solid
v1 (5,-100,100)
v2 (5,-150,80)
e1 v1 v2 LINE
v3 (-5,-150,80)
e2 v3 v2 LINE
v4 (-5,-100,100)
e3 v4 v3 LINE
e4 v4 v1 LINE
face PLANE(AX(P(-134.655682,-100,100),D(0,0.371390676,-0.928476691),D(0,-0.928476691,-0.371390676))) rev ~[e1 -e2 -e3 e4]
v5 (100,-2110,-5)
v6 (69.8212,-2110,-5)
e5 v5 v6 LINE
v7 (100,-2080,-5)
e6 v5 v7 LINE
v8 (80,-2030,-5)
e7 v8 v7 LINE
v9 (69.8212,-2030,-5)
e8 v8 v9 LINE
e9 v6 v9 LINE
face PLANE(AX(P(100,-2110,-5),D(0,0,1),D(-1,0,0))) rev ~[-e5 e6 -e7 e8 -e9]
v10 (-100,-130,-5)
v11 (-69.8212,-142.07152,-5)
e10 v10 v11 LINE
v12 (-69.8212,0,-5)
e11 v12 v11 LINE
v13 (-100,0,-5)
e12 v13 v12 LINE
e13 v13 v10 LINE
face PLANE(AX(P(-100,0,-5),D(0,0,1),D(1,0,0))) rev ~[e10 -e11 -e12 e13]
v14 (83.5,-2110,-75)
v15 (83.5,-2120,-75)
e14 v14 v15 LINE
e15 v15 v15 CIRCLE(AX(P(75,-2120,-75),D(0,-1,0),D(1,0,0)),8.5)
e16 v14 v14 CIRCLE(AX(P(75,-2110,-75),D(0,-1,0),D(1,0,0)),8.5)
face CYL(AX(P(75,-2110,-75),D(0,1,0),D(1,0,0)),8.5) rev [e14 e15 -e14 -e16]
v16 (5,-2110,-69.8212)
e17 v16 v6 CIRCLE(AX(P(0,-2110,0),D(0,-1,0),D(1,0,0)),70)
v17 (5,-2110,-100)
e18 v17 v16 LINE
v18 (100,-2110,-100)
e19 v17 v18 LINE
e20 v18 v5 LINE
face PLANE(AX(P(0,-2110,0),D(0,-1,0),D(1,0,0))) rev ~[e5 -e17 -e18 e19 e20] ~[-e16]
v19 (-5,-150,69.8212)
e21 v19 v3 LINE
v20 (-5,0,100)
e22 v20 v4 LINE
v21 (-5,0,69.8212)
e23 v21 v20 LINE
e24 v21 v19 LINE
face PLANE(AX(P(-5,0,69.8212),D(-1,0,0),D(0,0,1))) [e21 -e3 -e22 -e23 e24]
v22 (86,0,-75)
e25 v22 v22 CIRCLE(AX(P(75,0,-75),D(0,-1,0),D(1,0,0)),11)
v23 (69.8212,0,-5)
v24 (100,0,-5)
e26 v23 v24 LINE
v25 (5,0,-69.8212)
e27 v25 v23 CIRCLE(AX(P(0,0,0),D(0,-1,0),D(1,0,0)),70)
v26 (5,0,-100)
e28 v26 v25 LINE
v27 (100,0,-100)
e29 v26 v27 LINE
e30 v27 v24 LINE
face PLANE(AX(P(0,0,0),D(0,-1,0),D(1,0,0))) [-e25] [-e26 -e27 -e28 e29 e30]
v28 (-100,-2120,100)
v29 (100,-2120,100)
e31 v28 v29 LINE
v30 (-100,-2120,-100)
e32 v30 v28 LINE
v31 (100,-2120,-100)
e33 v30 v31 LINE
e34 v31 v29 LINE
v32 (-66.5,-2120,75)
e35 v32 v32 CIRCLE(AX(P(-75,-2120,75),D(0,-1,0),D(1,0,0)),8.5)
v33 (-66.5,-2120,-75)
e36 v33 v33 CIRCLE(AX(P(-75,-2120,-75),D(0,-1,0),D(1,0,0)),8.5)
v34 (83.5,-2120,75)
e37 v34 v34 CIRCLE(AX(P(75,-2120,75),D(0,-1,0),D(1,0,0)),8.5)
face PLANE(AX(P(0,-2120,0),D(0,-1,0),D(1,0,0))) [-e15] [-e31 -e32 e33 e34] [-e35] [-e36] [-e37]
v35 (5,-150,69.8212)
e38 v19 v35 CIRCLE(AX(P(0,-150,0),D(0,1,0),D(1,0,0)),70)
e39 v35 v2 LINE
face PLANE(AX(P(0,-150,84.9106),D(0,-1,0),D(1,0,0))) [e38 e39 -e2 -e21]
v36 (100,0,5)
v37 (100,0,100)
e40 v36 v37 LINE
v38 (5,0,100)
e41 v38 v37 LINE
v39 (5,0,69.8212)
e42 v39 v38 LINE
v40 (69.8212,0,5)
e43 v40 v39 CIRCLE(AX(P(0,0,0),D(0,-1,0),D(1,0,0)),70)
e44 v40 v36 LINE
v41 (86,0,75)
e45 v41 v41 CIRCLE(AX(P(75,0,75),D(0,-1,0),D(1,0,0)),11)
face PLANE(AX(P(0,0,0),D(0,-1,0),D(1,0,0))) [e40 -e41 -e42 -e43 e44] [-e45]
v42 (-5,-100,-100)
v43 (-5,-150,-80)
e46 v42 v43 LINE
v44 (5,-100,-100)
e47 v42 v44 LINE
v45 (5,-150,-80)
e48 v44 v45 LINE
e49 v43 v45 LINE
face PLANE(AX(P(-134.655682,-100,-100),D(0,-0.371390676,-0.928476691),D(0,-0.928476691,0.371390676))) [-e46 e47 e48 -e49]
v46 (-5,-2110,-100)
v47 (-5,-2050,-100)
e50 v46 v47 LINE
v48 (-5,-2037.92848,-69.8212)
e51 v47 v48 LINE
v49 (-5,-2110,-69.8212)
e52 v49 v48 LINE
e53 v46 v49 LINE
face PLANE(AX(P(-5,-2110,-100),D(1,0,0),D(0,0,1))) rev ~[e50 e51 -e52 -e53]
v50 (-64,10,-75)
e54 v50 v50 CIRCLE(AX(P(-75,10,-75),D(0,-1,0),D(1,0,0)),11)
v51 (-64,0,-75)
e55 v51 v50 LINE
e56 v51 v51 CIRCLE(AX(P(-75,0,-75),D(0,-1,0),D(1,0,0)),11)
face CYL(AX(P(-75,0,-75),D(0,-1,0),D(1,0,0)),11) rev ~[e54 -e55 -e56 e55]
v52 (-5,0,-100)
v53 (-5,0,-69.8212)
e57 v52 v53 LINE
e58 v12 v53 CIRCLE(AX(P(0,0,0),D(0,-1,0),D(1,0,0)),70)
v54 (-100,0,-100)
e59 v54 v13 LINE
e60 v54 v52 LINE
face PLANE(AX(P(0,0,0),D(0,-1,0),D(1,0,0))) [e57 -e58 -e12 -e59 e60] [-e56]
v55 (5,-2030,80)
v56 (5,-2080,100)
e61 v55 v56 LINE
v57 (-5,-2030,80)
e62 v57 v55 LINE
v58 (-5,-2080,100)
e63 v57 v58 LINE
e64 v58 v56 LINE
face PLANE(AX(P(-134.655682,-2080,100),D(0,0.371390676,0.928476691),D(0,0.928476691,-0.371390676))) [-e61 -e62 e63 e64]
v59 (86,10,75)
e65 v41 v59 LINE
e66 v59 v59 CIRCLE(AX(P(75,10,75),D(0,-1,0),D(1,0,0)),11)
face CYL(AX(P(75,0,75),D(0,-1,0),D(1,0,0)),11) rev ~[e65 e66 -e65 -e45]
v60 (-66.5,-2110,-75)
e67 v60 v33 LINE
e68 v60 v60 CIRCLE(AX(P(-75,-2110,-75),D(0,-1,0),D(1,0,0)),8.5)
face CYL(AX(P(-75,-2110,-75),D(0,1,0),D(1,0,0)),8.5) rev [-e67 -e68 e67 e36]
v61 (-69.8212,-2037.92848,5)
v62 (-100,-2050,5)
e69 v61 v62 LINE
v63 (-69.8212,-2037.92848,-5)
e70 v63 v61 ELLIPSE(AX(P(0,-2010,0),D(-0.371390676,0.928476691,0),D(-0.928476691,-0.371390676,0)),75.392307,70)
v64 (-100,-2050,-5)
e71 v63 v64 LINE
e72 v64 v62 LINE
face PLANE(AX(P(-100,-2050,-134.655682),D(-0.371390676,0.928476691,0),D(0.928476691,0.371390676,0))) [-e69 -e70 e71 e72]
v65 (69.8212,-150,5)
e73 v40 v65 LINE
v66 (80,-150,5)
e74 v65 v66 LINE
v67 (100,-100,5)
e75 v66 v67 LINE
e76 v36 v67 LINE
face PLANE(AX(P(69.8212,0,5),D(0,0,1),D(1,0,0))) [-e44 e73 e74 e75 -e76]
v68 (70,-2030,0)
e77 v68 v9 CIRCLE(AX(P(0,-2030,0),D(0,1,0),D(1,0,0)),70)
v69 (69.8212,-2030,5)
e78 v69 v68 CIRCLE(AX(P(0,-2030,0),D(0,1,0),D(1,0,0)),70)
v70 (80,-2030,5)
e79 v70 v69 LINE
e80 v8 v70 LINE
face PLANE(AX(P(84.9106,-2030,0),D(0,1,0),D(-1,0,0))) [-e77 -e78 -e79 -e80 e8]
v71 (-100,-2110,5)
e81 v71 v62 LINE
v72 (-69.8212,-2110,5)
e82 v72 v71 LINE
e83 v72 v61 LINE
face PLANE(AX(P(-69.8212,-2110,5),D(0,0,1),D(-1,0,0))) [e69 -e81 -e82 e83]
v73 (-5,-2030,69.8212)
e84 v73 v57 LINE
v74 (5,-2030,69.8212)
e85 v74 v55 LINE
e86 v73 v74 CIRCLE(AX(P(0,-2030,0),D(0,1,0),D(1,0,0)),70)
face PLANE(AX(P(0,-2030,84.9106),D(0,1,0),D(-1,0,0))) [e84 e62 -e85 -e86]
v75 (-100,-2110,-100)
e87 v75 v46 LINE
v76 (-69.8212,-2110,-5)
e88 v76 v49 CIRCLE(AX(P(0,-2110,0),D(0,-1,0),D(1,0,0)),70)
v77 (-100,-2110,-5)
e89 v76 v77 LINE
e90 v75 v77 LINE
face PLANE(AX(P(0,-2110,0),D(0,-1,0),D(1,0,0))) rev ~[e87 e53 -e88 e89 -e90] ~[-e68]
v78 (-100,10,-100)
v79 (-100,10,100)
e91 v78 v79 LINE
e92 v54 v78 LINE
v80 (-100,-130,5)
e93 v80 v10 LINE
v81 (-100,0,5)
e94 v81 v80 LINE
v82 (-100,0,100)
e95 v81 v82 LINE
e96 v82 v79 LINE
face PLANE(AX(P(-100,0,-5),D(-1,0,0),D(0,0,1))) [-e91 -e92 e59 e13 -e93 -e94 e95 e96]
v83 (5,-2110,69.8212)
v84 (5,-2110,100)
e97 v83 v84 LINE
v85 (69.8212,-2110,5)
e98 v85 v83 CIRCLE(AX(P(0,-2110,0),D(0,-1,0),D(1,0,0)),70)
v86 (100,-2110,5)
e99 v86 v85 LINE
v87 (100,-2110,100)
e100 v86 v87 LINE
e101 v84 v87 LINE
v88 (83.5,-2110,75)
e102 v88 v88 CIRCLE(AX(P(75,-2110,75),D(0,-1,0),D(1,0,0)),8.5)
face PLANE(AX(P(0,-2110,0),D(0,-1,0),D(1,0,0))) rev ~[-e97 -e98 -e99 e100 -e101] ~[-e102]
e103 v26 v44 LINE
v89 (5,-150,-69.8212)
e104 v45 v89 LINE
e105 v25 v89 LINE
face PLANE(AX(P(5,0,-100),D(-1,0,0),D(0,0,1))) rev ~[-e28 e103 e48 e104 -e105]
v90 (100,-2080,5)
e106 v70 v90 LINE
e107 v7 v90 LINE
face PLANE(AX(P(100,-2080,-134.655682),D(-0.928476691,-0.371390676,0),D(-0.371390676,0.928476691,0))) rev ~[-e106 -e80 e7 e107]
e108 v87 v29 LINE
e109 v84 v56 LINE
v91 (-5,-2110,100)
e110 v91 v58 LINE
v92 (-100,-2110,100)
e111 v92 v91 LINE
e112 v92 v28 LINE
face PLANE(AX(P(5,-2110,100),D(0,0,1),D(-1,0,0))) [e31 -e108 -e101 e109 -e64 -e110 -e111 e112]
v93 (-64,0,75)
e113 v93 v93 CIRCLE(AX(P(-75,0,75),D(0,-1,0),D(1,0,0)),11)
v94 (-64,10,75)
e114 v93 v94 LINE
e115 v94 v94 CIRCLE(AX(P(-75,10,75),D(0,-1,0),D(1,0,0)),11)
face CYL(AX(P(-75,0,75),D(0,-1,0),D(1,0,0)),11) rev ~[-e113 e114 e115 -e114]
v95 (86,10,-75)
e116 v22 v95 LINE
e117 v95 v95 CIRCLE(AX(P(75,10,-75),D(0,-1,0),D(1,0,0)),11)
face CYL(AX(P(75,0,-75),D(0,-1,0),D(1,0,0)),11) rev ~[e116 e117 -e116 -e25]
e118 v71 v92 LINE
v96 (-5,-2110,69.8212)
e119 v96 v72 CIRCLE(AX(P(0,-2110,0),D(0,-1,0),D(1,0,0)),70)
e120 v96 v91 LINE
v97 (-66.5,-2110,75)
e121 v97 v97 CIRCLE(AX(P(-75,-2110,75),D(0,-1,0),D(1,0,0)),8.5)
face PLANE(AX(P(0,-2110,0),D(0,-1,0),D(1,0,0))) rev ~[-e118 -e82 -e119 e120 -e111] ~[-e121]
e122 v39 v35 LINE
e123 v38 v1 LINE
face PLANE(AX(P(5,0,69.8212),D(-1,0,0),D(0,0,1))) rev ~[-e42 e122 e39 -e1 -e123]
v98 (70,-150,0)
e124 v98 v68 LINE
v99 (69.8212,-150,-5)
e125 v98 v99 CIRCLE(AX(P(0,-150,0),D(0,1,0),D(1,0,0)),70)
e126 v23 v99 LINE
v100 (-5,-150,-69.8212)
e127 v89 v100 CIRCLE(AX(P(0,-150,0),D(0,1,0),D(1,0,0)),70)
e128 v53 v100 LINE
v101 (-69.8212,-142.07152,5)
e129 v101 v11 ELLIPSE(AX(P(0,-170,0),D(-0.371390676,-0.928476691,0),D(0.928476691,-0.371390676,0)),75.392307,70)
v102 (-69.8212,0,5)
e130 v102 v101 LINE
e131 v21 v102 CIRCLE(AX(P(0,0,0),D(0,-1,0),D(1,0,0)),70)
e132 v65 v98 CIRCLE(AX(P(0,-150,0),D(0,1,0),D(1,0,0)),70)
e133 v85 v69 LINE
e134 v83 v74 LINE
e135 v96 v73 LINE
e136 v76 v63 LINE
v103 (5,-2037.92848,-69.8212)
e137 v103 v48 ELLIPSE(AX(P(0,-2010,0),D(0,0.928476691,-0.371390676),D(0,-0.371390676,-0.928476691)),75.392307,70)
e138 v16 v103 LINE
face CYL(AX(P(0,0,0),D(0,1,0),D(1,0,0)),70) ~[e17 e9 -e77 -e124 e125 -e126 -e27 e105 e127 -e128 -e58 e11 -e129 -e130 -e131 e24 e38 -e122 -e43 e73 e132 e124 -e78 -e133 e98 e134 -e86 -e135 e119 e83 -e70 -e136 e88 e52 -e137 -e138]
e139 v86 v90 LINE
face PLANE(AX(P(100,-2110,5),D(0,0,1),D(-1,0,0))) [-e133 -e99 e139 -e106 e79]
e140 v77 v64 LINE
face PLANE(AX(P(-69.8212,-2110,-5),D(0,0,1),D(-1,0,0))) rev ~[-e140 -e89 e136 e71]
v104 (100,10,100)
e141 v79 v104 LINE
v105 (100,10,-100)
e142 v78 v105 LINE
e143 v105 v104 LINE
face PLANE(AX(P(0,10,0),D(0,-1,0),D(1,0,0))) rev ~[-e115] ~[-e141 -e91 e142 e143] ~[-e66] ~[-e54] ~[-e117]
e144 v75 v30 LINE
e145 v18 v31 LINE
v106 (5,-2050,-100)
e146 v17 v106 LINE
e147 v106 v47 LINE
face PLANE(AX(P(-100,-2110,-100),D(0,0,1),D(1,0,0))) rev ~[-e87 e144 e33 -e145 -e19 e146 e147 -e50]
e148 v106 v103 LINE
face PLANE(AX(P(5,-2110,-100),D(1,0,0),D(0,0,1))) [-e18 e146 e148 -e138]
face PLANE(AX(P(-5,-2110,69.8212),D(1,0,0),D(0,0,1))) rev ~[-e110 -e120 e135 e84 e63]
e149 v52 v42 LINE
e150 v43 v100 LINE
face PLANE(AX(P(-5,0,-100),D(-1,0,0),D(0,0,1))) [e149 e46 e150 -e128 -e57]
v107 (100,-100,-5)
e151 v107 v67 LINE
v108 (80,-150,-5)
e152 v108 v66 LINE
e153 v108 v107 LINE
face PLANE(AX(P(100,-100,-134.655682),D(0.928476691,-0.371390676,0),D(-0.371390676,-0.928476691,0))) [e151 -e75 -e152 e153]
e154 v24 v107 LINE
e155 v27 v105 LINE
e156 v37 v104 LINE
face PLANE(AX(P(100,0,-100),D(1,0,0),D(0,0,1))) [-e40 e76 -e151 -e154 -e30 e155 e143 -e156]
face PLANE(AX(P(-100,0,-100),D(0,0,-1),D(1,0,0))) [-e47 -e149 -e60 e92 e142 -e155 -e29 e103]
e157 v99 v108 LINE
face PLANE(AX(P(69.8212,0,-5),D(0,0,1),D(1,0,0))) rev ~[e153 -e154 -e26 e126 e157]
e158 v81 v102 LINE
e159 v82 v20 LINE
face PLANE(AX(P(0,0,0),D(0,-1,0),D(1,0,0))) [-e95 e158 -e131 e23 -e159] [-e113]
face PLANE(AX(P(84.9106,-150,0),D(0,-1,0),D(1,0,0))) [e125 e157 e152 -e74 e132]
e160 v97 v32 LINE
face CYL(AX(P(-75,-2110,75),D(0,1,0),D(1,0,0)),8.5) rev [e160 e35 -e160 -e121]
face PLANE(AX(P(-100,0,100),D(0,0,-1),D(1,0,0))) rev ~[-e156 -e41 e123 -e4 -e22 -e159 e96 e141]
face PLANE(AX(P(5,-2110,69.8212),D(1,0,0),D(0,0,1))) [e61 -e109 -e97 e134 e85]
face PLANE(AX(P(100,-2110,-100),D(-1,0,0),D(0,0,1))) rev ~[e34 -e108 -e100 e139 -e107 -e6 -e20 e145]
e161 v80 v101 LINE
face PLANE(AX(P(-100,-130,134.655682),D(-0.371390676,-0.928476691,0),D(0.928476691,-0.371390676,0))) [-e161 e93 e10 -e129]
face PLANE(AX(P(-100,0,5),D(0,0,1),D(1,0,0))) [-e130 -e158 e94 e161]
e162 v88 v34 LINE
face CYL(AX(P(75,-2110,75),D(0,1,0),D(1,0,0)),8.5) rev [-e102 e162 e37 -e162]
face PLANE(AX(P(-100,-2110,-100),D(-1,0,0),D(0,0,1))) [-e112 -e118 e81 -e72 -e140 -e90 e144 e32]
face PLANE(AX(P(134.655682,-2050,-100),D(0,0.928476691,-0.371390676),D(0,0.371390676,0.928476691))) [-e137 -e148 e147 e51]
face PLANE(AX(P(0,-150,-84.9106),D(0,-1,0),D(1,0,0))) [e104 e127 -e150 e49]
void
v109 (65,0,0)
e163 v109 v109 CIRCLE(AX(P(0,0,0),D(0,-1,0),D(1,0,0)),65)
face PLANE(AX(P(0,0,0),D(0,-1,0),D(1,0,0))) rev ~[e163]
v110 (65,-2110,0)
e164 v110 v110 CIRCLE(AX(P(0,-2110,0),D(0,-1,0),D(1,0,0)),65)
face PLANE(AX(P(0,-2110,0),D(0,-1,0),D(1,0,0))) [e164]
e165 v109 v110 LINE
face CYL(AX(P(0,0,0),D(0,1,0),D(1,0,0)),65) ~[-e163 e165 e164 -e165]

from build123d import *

# Parameters (mm, degrees)
F0_R          = 70
F0_R_2        = 65
F1_DEPTH      = 2110
F2_W          = 200
F2_H          = 200
F2_R          = 11
F3_DEPTH      = 10
F4_W          = 30.1787997812
F4_H          = 10
F4_W_2        = 10
F4_H_2        = 30.1787997812
F5_DEPTH      = 150
F6_T1_DEPTH   = 269.311363913
F6_T3_DEPTH   = 269.311363913
F6_T8_DEPTH   = 269.311363913
F6_S9_R       = 70
F6_T10_DEPTH  = 139
F8_W          = 200
F8_H          = 200
F8_R          = 8.5
F9_DEPTH      = 10
F10_W         = 10
F10_H         = 30.1787997812
F10_W_2       = 30.1787997812
F10_H_2       = 10
F11_DEPTH     = 80
F12_T1_DEPTH  = 269.311363913
F12_T3_DEPTH  = 269.311363913
F12_T8_DEPTH  = 269.311363913
F12_S9_R      = 70
F12_T10_DEPTH = 139
F12_T14_DEPTH = 269.311363913
F12_S15_R     = 70
F12_T16_DEPTH = 139


# Not quite as in the source:
# - a fillet or chamfer that OpenCascade refuses, or shapes differently, is made with other operations: its cross-section is extruded or revolved along the edge and cut away or added


with BuildPart() as f1:
    # F0 (on Front) → F1 (new body)
    with BuildSketch(Plane.XZ):
        Circle(F0_R)
        Circle(F0_R_2, mode=Mode.SUBTRACT)
    extrude(amount=F1_DEPTH)

    # F2 (on Front) → F3 (join)
    with BuildSketch(Plane.XZ):
        Rectangle(F2_W, F2_H)
        with Locations((-75, -75)):
            Circle(F2_R, mode=Mode.SUBTRACT)
        with Locations((75, -75)):
            Circle(F2_R, mode=Mode.SUBTRACT)
        with Locations((-75, 75)):
            Circle(F2_R, mode=Mode.SUBTRACT)
        with Locations((75, 75)):
            Circle(F2_R, mode=Mode.SUBTRACT)
    extrude(amount=-F3_DEPTH)

    # F4 (on Front) → F5 (join)
    with BuildSketch(Plane.XZ):
        with Locations((-84.9106001094, 0)):
            Rectangle(F4_W, F4_H)
        with Locations((0, 84.9106001094)):
            Rectangle(F4_W_2, F4_H_2)
        with Locations((84.9106001094, 0)):
            Rectangle(F4_W, F4_H)
        with Locations((0, -84.9106001094)):
            Rectangle(F4_W_2, F4_H_2)
    extrude(amount=F5_DEPTH)

    # F6: chamfer of 50 x 20 on 4 edges, made by hand

    # F6_s2 → F6_t1 (cut)
    with BuildSketch(Plane.YZ.offset(-134.6556819565)):
        Polygon((-100, 100), (-150, 80), (-150, 100), align=None)
        Polygon((-100, -100), (-150, -80), (-150, -100), align=None)
    extrude(amount=F6_T1_DEPTH, mode=Mode.SUBTRACT)

    # F6_s4 → F6_t3 (cut)
    with BuildSketch(Plane.XY.offset(-134.6556819565)):
        Polygon((100, -100), (80, -150), (100, -150), align=None)
    extrude(amount=F6_T3_DEPTH, mode=Mode.SUBTRACT)


with BuildPart() as f6_tool6:
    # F6_s7 → F6_t8 (new body)
    with BuildSketch(Plane.XY.offset(134.6556819565)):
        Polygon((-100, -130), (-50, -150), (-100, -150), align=None)
    extrude(amount=-F6_T8_DEPTH)

    # F6_s9 → F6_t10 (cut, symmetric)
    with BuildSketch(Plane.XZ.offset(140)):
        Circle(F6_S9_R)
    extrude(amount=F6_T10_DEPTH, both=True, mode=Mode.SUBTRACT)


with BuildPart() as f1_1:
    add(f1.part)

    # F6_t5: cut F6_tool6
    add(f6_tool6.part, mode=Mode.SUBTRACT)

    # F8 (on offset) → F9 (join)
    with BuildSketch(Plane.XZ.offset(2110)):
        Rectangle(F8_W, F8_H)
        with Locations((-75, -75)):
            Circle(F8_R, mode=Mode.SUBTRACT)
        with Locations((75, -75)):
            Circle(F8_R, mode=Mode.SUBTRACT)
        with Locations((-75, 75)):
            Circle(F8_R, mode=Mode.SUBTRACT)
        with Locations((75, 75)):
            Circle(F8_R, mode=Mode.SUBTRACT)
    extrude(amount=F9_DEPTH)

    # F10 (on face) → F11 (join)
    with BuildSketch(Plane(origin=(0, -2110, 0), x_dir=(-1, 0, 0), z_dir=(0, 1, 0))):
        with Locations((0, 84.9106001094)):
            Rectangle(F10_W, F10_H)
        with Locations((84.9106001094, 0)):
            Rectangle(F10_W_2, F10_H_2)
        with Locations((0, -84.9106001094)):
            Rectangle(F10_W, F10_H)
        with Locations((-84.9106001094, 0)):
            Rectangle(F10_W_2, F10_H_2)
    extrude(amount=F11_DEPTH)

    # F12: chamfer of 20 x 50 on 4 edges, made by hand

    # F12_s2 → F12_t1 (cut)
    with BuildSketch(Plane.YZ.offset(-134.6556819565)):
        Polygon((-2080, 100), (-2030, 80), (-2030, 100), align=None)
    extrude(amount=F12_T1_DEPTH, mode=Mode.SUBTRACT)

    # F12_s4 → F12_t3 (cut)
    with BuildSketch(Plane.XY.offset(-134.6556819565)):
        Polygon((100, -2080), (80, -2030), (100, -2030), align=None)
    extrude(amount=F12_T3_DEPTH, mode=Mode.SUBTRACT)


with BuildPart() as f12_tool6:
    # F12_s7 → F12_t8 (new body)
    with BuildSketch(Plane.XY.offset(-134.6556819565)):
        Polygon((-100, -2050), (-50, -2030), (-100, -2030), align=None)
    extrude(amount=F12_T8_DEPTH)

    # F12_s9 → F12_t10 (cut, symmetric)
    with BuildSketch(Plane.XZ.offset(2040)):
        Circle(F12_S9_R)
    extrude(amount=F12_T10_DEPTH, both=True, mode=Mode.SUBTRACT)


with BuildPart() as f1_2:
    add(f1_1.part)

    # F12_t5: cut F12_tool6
    add(f12_tool6.part, mode=Mode.SUBTRACT)


with BuildPart() as f12_tool12:
    # F12_s13 → F12_t14 (new body)
    with BuildSketch(Plane.YZ.offset(134.6556819565)):
        Polygon((-2050, -100), (-2030, -50), (-2030, -100), align=None)
    extrude(amount=-F12_T14_DEPTH)

    # F12_s15 → F12_t16 (cut, symmetric)
    with BuildSketch(Plane.XZ.offset(2040)):
        Circle(F12_S15_R)
    extrude(amount=F12_T16_DEPTH, both=True, mode=Mode.SUBTRACT)


with BuildPart() as f1_3:
    add(f1_2.part)

    # F12_t11: cut F12_tool12
    add(f12_tool12.part, mode=Mode.SUBTRACT)


solid = f1_3.part
